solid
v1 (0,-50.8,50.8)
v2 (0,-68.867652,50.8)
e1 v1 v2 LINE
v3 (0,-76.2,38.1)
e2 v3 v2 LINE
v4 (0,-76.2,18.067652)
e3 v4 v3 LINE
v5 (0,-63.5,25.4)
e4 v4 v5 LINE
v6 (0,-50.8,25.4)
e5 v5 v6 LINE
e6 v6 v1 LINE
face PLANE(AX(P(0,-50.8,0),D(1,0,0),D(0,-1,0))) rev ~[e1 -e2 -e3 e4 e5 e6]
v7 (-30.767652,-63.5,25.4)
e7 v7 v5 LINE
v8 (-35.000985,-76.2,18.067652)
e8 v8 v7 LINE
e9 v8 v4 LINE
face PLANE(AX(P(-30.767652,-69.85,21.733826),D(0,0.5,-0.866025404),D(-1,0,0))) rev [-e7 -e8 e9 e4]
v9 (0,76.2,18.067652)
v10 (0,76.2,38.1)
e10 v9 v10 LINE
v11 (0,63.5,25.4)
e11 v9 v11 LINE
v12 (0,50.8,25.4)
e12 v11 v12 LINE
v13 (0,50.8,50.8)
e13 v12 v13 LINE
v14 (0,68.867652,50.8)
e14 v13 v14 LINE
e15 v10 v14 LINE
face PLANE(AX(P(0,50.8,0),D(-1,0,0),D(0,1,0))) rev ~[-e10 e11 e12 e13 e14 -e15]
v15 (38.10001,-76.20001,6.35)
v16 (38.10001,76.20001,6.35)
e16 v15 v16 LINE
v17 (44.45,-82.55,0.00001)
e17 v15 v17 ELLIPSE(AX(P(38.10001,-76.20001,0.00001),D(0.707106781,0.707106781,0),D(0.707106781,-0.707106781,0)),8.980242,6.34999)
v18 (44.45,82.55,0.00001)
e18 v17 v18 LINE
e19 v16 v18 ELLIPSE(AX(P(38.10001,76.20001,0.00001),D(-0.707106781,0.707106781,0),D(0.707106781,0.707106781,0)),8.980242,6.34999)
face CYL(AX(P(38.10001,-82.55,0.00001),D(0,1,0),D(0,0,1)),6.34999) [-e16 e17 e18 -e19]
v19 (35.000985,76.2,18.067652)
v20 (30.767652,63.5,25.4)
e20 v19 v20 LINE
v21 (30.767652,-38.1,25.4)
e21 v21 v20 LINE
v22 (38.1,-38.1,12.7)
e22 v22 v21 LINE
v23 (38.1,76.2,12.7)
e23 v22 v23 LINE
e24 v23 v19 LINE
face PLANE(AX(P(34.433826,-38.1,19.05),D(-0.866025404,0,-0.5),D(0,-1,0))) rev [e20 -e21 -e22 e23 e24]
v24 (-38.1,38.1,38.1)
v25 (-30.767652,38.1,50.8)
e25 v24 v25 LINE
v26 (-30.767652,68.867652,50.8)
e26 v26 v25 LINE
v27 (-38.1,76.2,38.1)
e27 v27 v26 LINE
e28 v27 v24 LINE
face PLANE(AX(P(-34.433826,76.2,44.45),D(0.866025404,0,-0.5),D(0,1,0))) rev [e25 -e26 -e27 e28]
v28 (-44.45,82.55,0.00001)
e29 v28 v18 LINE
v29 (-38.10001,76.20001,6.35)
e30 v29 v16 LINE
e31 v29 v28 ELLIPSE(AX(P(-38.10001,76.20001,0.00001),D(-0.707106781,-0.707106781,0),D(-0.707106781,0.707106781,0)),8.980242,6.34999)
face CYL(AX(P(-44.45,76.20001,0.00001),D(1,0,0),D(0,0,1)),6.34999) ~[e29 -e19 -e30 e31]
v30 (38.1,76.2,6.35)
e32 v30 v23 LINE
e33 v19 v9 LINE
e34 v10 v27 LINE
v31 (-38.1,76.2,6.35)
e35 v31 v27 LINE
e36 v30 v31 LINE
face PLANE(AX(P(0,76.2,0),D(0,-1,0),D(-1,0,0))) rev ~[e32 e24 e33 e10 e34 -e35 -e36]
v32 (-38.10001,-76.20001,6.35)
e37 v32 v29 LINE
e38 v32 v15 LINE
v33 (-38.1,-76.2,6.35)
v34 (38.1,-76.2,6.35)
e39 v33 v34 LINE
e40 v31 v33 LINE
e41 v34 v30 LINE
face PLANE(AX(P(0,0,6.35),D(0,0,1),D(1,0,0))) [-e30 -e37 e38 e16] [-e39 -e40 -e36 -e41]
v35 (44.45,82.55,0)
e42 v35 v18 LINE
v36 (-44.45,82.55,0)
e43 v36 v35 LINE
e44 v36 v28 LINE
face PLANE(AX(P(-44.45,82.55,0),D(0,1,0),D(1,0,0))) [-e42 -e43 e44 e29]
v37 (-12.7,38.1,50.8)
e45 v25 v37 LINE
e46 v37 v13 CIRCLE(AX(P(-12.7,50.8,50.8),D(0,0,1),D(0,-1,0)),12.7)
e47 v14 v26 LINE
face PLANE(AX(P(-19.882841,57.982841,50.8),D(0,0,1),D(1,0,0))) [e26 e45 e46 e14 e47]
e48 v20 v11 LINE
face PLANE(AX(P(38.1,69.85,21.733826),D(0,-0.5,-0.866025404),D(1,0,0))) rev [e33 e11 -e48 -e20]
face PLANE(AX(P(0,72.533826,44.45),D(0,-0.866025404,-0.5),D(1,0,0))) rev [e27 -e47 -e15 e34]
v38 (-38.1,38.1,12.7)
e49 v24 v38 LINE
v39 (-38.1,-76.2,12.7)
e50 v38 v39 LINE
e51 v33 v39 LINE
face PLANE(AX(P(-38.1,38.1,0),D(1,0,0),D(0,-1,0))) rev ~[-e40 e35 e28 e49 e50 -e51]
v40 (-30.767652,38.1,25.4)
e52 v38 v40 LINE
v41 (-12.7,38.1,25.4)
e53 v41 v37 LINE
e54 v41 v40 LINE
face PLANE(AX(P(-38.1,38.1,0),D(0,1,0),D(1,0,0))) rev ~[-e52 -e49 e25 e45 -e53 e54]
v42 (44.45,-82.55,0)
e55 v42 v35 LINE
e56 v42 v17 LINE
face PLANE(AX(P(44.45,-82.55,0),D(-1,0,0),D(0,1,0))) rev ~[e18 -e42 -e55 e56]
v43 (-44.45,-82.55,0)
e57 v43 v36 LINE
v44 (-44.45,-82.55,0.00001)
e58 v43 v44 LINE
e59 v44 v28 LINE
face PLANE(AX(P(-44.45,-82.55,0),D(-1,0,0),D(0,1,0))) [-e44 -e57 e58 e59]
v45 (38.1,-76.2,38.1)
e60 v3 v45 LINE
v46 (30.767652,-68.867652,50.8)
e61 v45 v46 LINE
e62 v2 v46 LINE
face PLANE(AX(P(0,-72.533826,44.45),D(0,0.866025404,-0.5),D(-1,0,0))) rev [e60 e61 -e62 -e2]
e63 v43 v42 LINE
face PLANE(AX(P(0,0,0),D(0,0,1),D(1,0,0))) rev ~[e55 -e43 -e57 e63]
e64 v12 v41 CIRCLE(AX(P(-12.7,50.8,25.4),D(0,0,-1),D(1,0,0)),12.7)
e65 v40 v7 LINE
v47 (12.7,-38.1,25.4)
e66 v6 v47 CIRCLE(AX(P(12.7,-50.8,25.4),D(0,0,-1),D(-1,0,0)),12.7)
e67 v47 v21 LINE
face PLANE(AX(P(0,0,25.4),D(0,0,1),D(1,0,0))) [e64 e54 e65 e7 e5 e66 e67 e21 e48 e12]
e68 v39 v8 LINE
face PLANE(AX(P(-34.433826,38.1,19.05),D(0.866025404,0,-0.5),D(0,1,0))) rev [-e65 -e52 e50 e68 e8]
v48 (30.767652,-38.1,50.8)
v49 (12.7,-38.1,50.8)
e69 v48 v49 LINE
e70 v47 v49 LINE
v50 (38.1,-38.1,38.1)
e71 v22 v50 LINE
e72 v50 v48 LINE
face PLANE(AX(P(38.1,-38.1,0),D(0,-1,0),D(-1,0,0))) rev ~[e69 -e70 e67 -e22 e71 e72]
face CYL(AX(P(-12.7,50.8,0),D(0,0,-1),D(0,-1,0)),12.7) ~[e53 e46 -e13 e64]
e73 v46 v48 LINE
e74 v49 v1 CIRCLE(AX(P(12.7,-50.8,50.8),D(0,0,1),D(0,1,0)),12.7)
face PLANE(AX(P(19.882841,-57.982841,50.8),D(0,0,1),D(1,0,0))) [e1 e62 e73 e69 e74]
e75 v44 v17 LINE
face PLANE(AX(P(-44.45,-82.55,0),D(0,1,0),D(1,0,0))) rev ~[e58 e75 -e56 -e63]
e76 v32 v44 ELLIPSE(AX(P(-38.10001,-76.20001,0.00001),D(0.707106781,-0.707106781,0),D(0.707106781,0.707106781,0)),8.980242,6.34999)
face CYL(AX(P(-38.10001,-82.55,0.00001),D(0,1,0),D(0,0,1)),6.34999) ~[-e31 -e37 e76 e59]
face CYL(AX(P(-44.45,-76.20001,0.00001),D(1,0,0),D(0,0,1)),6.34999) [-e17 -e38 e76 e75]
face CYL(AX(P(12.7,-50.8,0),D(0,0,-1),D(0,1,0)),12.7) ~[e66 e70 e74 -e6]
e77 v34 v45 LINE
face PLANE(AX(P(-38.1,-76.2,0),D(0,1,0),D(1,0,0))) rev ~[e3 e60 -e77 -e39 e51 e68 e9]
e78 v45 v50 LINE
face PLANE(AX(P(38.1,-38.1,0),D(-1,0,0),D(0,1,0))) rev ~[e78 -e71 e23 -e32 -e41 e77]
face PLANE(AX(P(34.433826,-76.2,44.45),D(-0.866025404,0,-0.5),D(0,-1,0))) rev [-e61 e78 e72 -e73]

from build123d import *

# Parameters (mm, degrees)
F0_W        = 88.9
F0_H        = 165.1
F1_DEPTH    = 6.35
F2_DEPTH    = 25.4
F3_DEPTH    = 50.8
F4_C1_SIZE2 = 7.3323484187
F4_C1_SIZE  = 12.7
F4_C2_SIZE2 = 7.3323484187
F4_C2_SIZE  = 12.7
F4_C3_SIZE2 = 12.7
F4_C3_SIZE  = 7.3323484187
F4_C4_SIZE2 = 7.3323484187
F4_C4_SIZE  = 12.7
F5_C1_SIZE2 = 12.7
F5_C1_SIZE  = 7.3323484187
F5_C2_SIZE2 = 7.3323484187
F5_C2_SIZE  = 12.7
F5_C3_SIZE2 = 7.3323484187
F5_C3_SIZE  = 12.7
F5_C4_SIZE2 = 7.3323484187
F5_C4_SIZE  = 12.7
F6_R        = 6.34999


# Not quite as in the source:
# - a fillet or chamfer is up to 0.001 mm smaller than in the source, because OpenCascade refuses the exact size


with BuildPart() as f1:
    # F0 (on Top) → F1 (new body)
    with BuildSketch(Plane.XY):
        Rectangle(F0_W, F0_H)
        Polygon((0, 76.2), (38.1, 76.2), (38.1, -38.1), (38.1, -76.2), (0, -76.2), (-38.1, -76.2), (-38.1, 38.1), (-38.1, 76.2), align=None, mode=Mode.SUBTRACT)
    extrude(amount=F1_DEPTH)

    # F0 (on Top) → F2 (join)
    with BuildSketch(Plane.XY):
        with BuildLine():
            Line((38.1, -38.1), (38.1, 76.2))
            Line((38.1, 76.2), (0, 76.2))
            Line((0, 76.2), (0, 50.8))
            ThreePointArc((0, 50.8), (-3.7197438789, 41.8197438789), (-12.7, 38.1))
            Line((-12.7, 38.1), (-38.1, 38.1))
            Line((-38.1, 38.1), (-38.1, -76.2))
            Line((-38.1, -76.2), (0, -76.2))
            Line((0, -76.2), (0, -50.8))
            ThreePointArc((0, -50.8), (3.7197438789, -41.8197438789), (12.7, -38.1))
            Line((12.7, -38.1), (38.1, -38.1))
        make_face()
    extrude(amount=F2_DEPTH)

    # F0 (on Top) → F3 (join)
    with BuildSketch(Plane.XY):
        with BuildLine():
            Line((0, 50.8), (0, 76.2))
            Line((0, 76.2), (-38.1, 76.2))
            Line((-38.1, 76.2), (-38.1, 38.1))
            Line((-38.1, 38.1), (-12.7, 38.1))
            ThreePointArc((-12.7, 38.1), (-3.7197438789, 41.8197438789), (0, 50.8))
        make_face()
        with BuildLine():
            Line((38.1, -76.2), (38.1, -38.1))
            Line((38.1, -38.1), (12.7, -38.1))
            ThreePointArc((12.7, -38.1), (3.7197438789, -41.8197438789), (0, -50.8))
            Line((0, -50.8), (0, -76.2))
            Line((0, -76.2), (38.1, -76.2))
        make_face()
    extrude(amount=F3_DEPTH)

    # F4: chamfer of 12.7 x 7.3323484187 on 4 edges, made by hand

    # F4_c1
    f4_c1_edges = [f1.edges().sort_by_distance(p)[0] for p in [
        (-38.1, 57.15, 50.8),
    ]]
    f4_c1_side = f1.faces().sort_by_distance((-38.1, 57.15, 50.6533530316))[0]
    chamfer(f4_c1_edges, length=F4_C1_SIZE, length2=F4_C1_SIZE2, reference=f4_c1_side)

    # F4_c2
    f4_c2_edges = [f1.edges().sort_by_distance(p)[0] for p in [
        (-38.1, -19.05, 25.4),
    ]]
    f4_c2_side = f1.faces().sort_by_distance((-38.1, -19.05, 25.2533530316))[0]
    chamfer(f4_c2_edges, length=F4_C2_SIZE, length2=F4_C2_SIZE2, reference=f4_c2_side)

    # F4_c3
    f4_c3_edges = [f1.edges().sort_by_distance(p)[0] for p in [
        (-15.3838257906, -76.2, 25.4),
    ]]
    f4_c3_side = f1.faces().sort_by_distance((-15.3838257906, -76.2, 25.2533530316))[0]
    chamfer(f4_c3_edges, length=F4_C3_SIZE, length2=F4_C3_SIZE2, reference=f4_c3_side)

    # F4_c4
    f4_c4_edges = [f1.edges().sort_by_distance(p)[0] for p in [
        (-15.3838257906, 76.2, 50.8),
    ]]
    f4_c4_side = f1.faces().sort_by_distance((-15.3838257906, 76.2, 50.6533530316))[0]
    chamfer(f4_c4_edges, length=F4_C4_SIZE, length2=F4_C4_SIZE2, reference=f4_c4_side)

    # F5: chamfer of 12.7 x 7.3323484187 on 4 edges, made by hand

    # F5_c1
    f5_c1_edges = [f1.edges().sort_by_distance(p)[0] for p in [
        (19.05, 76.2, 25.4),
    ]]
    f5_c1_side = f1.faces().sort_by_distance((19.05, 76.2, 25.2533530316))[0]
    chamfer(f5_c1_edges, length=F5_C1_SIZE, length2=F5_C1_SIZE2, reference=f5_c1_side)

    # F5_c2
    f5_c2_edges = [f1.edges().sort_by_distance(p)[0] for p in [
        (38.1, 12.7, 25.4),
    ]]
    f5_c2_side = f1.faces().sort_by_distance((38.1, 12.7, 25.2533530316))[0]
    chamfer(f5_c2_edges, length=F5_C2_SIZE, length2=F5_C2_SIZE2, reference=f5_c2_side)

    # F5_c3
    f5_c3_edges = [f1.edges().sort_by_distance(p)[0] for p in [
        (38.1, -57.15, 50.8),
    ]]
    f5_c3_side = f1.faces().sort_by_distance((38.1, -57.15, 50.6533530316))[0]
    chamfer(f5_c3_edges, length=F5_C3_SIZE, length2=F5_C3_SIZE2, reference=f5_c3_side)

    # F5_c4
    f5_c4_edges = [f1.edges().sort_by_distance(p)[0] for p in [
        (15.3838257906, -76.2, 50.8),
    ]]
    f5_c4_side = f1.faces().sort_by_distance((15.3838257906, -76.2, 50.6533530316))[0]
    chamfer(f5_c4_edges, length=F5_C4_SIZE, length2=F5_C4_SIZE2, reference=f5_c4_side)

    # F6 (radius 6.35 in the source; OpenCascade refuses exactly that, so slightly less here)
    f6_edges = [f1.edges().sort_by_distance(p)[0] for p in [
        (-44.45, 0, 6.35),
        (0, -82.55, 6.35),
        (0, 82.55, 6.35),
        (44.45, 0, 6.35),
    ]]
    fillet(f6_edges, radius=F6_R)


solid = f1.part
